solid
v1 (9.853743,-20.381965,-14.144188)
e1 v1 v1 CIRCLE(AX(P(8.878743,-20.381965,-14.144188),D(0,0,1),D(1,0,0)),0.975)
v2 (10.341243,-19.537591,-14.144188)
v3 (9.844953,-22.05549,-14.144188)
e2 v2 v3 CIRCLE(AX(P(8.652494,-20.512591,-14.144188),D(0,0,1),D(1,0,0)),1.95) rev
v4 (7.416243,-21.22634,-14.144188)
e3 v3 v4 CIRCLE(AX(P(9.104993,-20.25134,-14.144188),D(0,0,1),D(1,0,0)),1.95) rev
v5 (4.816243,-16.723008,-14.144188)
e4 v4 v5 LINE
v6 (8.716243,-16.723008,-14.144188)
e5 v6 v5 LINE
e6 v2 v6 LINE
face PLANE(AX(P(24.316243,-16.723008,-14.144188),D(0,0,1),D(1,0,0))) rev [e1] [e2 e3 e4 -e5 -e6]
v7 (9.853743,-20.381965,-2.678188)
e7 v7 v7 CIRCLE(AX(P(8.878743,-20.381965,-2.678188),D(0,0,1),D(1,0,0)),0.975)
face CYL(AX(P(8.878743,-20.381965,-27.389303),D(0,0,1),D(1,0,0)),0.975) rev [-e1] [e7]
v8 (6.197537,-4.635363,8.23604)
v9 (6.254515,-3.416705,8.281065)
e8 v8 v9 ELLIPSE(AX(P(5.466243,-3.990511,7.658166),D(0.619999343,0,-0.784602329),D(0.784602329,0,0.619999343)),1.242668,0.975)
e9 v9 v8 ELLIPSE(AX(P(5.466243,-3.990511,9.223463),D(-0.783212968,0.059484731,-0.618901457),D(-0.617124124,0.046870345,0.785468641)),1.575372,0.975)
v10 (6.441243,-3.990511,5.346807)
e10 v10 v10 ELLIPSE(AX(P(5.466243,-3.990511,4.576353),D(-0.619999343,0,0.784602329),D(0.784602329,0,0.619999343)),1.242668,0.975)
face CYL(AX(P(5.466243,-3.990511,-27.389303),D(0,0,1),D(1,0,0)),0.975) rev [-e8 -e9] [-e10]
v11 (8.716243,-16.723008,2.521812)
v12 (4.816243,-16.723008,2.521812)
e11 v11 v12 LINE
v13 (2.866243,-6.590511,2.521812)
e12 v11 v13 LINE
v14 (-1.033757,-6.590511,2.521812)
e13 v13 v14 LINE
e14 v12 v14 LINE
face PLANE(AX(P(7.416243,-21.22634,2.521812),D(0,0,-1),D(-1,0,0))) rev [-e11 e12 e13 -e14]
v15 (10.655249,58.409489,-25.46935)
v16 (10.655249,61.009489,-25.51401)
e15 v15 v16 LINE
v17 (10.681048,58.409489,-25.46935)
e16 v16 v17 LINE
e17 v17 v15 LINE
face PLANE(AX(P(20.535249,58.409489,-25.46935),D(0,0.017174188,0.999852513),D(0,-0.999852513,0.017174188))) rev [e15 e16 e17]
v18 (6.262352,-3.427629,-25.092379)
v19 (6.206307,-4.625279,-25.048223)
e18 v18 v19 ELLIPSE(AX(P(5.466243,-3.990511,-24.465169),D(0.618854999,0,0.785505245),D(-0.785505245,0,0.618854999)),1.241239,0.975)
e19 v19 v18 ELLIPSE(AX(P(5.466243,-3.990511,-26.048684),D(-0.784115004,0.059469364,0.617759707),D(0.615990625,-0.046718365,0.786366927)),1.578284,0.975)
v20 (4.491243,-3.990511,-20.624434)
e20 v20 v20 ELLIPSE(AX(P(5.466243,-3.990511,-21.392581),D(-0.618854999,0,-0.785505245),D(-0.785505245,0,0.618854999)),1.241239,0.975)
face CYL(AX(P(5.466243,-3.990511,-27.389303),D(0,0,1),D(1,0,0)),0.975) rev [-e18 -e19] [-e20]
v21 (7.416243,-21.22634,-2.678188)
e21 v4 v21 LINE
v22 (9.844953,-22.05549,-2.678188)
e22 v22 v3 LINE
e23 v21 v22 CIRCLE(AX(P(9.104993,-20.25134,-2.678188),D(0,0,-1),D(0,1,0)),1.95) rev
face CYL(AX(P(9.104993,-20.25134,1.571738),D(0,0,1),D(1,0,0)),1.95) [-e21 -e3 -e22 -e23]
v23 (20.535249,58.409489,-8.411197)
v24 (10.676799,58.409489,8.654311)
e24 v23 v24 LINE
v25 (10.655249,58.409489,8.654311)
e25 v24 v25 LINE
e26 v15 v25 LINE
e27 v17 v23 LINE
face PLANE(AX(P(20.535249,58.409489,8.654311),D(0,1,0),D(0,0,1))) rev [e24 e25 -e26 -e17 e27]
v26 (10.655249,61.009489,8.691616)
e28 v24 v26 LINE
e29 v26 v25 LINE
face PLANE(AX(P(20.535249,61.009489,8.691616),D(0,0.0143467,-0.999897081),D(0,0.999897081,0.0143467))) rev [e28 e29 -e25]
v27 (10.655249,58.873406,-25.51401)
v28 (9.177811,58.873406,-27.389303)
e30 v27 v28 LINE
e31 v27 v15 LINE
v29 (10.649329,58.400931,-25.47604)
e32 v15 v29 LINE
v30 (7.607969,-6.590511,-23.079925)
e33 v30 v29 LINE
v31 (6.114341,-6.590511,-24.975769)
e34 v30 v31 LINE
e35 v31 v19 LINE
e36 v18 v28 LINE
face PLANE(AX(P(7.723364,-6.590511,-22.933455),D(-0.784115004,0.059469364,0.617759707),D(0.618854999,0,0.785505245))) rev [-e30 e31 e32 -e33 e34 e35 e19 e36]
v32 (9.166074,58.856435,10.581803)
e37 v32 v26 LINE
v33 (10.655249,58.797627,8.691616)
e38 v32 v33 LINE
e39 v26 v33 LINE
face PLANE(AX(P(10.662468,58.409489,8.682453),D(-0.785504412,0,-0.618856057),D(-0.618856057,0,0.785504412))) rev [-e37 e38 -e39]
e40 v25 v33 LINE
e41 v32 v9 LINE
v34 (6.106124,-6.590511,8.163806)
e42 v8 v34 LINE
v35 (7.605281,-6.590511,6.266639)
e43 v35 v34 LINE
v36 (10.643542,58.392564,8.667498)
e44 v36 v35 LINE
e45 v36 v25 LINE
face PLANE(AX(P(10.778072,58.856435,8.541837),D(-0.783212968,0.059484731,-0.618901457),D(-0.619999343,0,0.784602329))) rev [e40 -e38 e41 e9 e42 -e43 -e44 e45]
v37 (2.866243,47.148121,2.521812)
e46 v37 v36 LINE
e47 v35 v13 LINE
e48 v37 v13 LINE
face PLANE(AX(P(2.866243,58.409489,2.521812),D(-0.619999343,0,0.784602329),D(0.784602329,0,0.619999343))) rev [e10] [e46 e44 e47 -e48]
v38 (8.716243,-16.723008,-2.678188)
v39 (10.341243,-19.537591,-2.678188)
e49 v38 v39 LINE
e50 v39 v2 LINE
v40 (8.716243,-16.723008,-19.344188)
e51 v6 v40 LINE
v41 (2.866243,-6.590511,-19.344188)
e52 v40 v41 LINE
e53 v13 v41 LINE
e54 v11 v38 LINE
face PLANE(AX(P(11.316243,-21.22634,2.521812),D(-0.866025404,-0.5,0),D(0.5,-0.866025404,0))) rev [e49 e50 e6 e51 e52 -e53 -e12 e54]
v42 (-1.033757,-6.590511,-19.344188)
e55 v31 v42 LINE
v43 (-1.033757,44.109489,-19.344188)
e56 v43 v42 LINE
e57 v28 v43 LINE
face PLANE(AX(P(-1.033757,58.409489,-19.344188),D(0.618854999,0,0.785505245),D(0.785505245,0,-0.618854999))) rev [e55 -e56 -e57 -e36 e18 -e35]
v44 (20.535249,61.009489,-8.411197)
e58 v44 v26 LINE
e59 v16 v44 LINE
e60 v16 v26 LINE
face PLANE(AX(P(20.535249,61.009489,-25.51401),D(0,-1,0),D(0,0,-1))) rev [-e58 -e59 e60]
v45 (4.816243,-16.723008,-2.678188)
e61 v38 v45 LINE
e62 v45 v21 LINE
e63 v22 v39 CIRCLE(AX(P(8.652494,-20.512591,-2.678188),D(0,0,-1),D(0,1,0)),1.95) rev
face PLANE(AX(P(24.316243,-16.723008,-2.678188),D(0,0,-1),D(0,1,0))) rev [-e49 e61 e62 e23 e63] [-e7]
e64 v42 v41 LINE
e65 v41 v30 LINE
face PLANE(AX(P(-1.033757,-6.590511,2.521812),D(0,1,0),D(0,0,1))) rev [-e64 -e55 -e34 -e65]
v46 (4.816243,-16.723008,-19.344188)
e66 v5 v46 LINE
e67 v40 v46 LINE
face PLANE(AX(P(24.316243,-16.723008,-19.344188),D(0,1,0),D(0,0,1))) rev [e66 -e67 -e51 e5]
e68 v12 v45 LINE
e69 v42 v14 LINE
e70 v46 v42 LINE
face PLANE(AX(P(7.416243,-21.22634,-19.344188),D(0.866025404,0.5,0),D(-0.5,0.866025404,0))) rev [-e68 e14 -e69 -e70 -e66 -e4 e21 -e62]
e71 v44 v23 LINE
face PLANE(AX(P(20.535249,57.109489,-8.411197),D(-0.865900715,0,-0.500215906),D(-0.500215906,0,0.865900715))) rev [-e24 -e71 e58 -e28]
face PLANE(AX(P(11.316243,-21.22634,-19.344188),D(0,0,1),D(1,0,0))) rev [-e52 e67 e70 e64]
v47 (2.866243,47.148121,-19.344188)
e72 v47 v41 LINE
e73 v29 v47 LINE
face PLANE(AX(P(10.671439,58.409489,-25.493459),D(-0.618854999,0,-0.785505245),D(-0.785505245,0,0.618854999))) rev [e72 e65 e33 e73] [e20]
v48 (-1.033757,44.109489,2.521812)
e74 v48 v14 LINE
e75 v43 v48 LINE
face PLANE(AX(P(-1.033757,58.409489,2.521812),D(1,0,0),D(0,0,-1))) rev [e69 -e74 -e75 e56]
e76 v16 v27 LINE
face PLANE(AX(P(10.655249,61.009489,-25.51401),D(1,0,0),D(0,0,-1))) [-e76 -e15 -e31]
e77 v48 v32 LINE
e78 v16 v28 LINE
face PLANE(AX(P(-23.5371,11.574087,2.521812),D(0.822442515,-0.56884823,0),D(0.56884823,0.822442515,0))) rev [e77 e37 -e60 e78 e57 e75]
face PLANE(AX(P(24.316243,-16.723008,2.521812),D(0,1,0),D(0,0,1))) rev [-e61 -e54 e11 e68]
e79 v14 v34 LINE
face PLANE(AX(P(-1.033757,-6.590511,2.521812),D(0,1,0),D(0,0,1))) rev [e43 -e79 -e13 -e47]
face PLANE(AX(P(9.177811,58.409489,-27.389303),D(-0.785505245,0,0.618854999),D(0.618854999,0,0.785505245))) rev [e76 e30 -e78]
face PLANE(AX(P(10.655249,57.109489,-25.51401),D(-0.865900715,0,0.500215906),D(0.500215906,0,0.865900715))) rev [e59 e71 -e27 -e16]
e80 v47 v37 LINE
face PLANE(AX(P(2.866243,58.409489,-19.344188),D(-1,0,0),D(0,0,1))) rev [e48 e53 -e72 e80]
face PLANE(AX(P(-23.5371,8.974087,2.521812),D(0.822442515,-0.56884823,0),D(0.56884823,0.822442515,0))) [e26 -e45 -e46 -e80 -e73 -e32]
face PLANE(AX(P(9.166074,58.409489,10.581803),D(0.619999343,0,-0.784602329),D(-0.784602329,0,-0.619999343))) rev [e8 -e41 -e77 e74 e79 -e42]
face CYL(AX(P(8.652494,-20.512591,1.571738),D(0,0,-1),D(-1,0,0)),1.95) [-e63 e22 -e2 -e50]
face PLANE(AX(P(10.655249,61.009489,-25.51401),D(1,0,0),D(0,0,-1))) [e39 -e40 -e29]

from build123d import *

# Parameters (mm, degrees)
BOSS_EXTRUDE1_DEPTH     = 50
CUT_EXTRUDE1_DEPTH      = 30
BOSS_EXTRUDE2_DEPTH     = 2
CUT_EXTRUDE2_DEPTH      = 2
CUT_EXTRUDE3_DEPTH      = 2
SKETCH9_W               = 3
SKETCH9_H               = 16.82
BOSS_EXTRUDE3_DEPTH     = 13
SKETCH10_W              = 4
SKETCH10_H              = 4
CUT_EXTRUDE4_DEPTH      = 15
BOSS_EXTRUDE4_DEPTH     = 8.82
FILLET1_R               = 1.5
SKETCH12_R              = 0.75
CUT_EXTRUDE5_DEPTH      = 57.090755147
CUT_EXTRUDE7_DEPTH      = 58.56944687
CUT_EXTRUDE7_DEPTH_BACK = 58.56944687
SKETCH15_R              = 0.75
BOSS_EXTRUDE5_DEPTH     = 7.6
CUT_EXTRUDE8_DEPTH      = 3
CUT_EXTRUDE9_DEPTH      = 3
SCALE1_SCALE            = 1.3


with BuildPart() as part:
    # Sketch1 → Boss-Extrude1 (new body)
    with BuildSketch(Plane(origin=(0, 0, 0), x_dir=(1, 0, 0), z_dir=(0, 1, 0))):
        Polygon((0, 0), (0, 16.82), (7.855052448, 23.008549995), (9.003996979, 21.550208451), (3, 16.82), (3, 0), (8.997095559, -4.738955219), (7.846023294, -6.199993425), align=None)
    extrude(amount=BOSS_EXTRUDE1_DEPTH)

    # Sketch2 → Cut-Extrude1 (cut, along a direction that is not the sketch's normal)
    with BuildSketch(Plane(origin=(0, 0, 0), x_dir=(0.7846023293722103, 0, 0.6199993425348946), z_dir=(-0.6199993425348946, 0, 0.7846023293722103))):
        Polygon((11.46, 50), (0, 37), (0, 50), align=None)
    extrude(amount=-CUT_EXTRUDE1_DEPTH, dir=(0, 0, 1), mode=Mode.SUBTRACT)

    # Sketch5 → Boss-Extrude2 (add, along a direction that is not the sketch's normal)
    with BuildSketch(Plane(origin=(-17.310263861, 11.972767428, 0), x_dir=(0, 0, 1), z_dir=(-0.8224425153975565, 0.568848230081223, 0))):
        Polygon((0, 30.43037307), (6.199993425, 44.223196672), (4.746003384, 46.236948917), (-21.566016526, 46.236948917), (-23.008549995, 44.239069366), (-16.82, 30.43037307), align=None)
    extrude(amount=BOSS_EXTRUDE2_DEPTH, dir=(0, 1, 0))

    # Sketch6 → Cut-Extrude2 (cut)
    with BuildSketch(Plane(origin=(0, 0, 0), x_dir=(0.7846023293722103, 0, 0.6199993425348946), z_dir=(-0.6199993425348946, 0, 0.7846023293722103))):
        Polygon((10, 50.343804538), (7, 0), (10, 0), align=None)
    extrude(amount=-CUT_EXTRUDE2_DEPTH, mode=Mode.SUBTRACT)

    # Sketch7 → Cut-Extrude3 (cut)
    with BuildSketch(Plane(origin=(-8.176434921, 0, -10.378250996), x_dir=(-0.7855052448151816, 0, 0.6188549994690533), z_dir=(-0.6188549994690533, 0, -0.7855052448151816))):
        Polygon((-20.409141091, 50.356858917), (-20.409141091, 0), (-17.409141091, 0), align=None)
    extrude(amount=-CUT_EXTRUDE3_DEPTH, mode=Mode.SUBTRACT)

    # Sketch9 → Boss-Extrude3 (add, along a direction that is not the sketch's normal)
    with BuildSketch(Plane.XZ):
        with Locations((1.5, -8.41)):
            Rectangle(SKETCH9_W, SKETCH9_H)
    extrude(amount=BOSS_EXTRUDE3_DEPTH, dir=(0.5000000000000012, -0.866025403784438, 0))

    # Sketch10 → Cut-Extrude4 (cut, along a direction that is not the sketch's normal)
    with BuildSketch(Plane(origin=(0, 0, 0), x_dir=(0, 0, 1), z_dir=(-0.8660254037844379, -0.5000000000000014, 0))):
        with Locations((-14.82, -11)):
            Rectangle(SKETCH10_W, SKETCH10_H)
        with Locations((-2, -11)):
            Rectangle(SKETCH10_W, SKETCH10_H)
    extrude(amount=-CUT_EXTRUDE4_DEPTH, dir=(-1, 0, 0), mode=Mode.SUBTRACT)

    # Sketch11 → Boss-Extrude4 (add)
    with BuildSketch(Plane(origin=(0, 0, -12.82), x_dir=(-1, 0, 0), z_dir=(0, 0, -1))):
        Polygon((-9.5, -11.258330249), (-7.25, -12.557368355), (-6.5, -11.258330249), align=None)
    extrude(amount=-BOSS_EXTRUDE4_DEPTH)

    # Fillet1
    # the kernel refuses this fillet: 1.5 mm, written as the material it takes off along each edge
    with BuildSketch(Plane(origin=(9.5, -11.258330249, -0.25), x_dir=(-0.8660254037844393, -0.49999999999999895, 0), z_dir=(0, 0, -1)), Plane(origin=(7.25, -12.557368355, -16.57), x_dir=(0.8660254037844389, 0.4999999999999996, 0), z_dir=(0, 0, 1))) as fillet1_piece_1:
        with BuildLine():
            CenterArc((FILLET1_R, FILLET1_R), FILLET1_R, 180, 90)
            Line((0, FILLET1_R), (0, 0))
            Line((0, 0), (FILLET1_R, 0))
        make_face()
    extrude(amount=16.32, mode=Mode.SUBTRACT)

    # Sketch12 → Cut-Extrude5 (cut, through all)
    with BuildSketch(Plane.XY.offset(-4)):
        with Locations((7.625, -10.608811196)):
            Circle(SKETCH12_R)
    extrude(amount=-CUT_EXTRUDE5_DEPTH, mode=Mode.SUBTRACT)

    # Sketch15 → Cut-Extrude7 (cut, two sides: drawn at the far end of the back side and taken through both)
    with BuildSketch(Plane.XY.offset(-CUT_EXTRUDE7_DEPTH_BACK)):
        with Locations(Location((5, 2, 0), (0, 0, 35.261867611))):
            Circle(SKETCH15_R)
    extrude(amount=CUT_EXTRUDE7_DEPTH + CUT_EXTRUDE7_DEPTH_BACK, mode=Mode.SUBTRACT)

    # Sketch17 → Boss-Extrude5 (add)
    with BuildSketch(Plane(origin=(8.991542695, 0, 0), x_dir=(0, 0, -1), z_dir=(1, 0, 0))):
        Polygon((-4.746003384, 52), (-4.717307032, 50), (21.531663082, 50), (21.566016526, 52), align=None)
    extrude(amount=BOSS_EXTRUDE5_DEPTH)

    # Sketch18 → Cut-Extrude8 (cut)
    with BuildSketch(Plane(origin=(0, 52, 0), x_dir=(1, 0, 0), z_dir=(0, 1, 0))):
        Polygon((8.991542695, 21.566016526), (16.591542695, 8.410006571), (16.591542695, 21.566016526), align=None)
    extrude(amount=-CUT_EXTRUDE8_DEPTH, mode=Mode.SUBTRACT)

    # Sketch19 → Cut-Extrude9 (cut)
    with BuildSketch(Plane(origin=(0, 52, 0), x_dir=(1, 0, 0), z_dir=(0, 1, 0))):
        Polygon((16.591542695, 8.410006571), (8.991542695, -4.746003384), (16.591542695, -4.746003384), align=None)
    extrude(amount=-CUT_EXTRUDE9_DEPTH, mode=Mode.SUBTRACT)


with BuildPart() as part_1:
    # Scale1: scaled about (3.445853057, 21.968382551, -8.406041901)
    add(part.part.scale(SCALE1_SCALE).moved(Location((-1.033755917, -6.590514765, 2.52181257))))


solid = part_1.part
